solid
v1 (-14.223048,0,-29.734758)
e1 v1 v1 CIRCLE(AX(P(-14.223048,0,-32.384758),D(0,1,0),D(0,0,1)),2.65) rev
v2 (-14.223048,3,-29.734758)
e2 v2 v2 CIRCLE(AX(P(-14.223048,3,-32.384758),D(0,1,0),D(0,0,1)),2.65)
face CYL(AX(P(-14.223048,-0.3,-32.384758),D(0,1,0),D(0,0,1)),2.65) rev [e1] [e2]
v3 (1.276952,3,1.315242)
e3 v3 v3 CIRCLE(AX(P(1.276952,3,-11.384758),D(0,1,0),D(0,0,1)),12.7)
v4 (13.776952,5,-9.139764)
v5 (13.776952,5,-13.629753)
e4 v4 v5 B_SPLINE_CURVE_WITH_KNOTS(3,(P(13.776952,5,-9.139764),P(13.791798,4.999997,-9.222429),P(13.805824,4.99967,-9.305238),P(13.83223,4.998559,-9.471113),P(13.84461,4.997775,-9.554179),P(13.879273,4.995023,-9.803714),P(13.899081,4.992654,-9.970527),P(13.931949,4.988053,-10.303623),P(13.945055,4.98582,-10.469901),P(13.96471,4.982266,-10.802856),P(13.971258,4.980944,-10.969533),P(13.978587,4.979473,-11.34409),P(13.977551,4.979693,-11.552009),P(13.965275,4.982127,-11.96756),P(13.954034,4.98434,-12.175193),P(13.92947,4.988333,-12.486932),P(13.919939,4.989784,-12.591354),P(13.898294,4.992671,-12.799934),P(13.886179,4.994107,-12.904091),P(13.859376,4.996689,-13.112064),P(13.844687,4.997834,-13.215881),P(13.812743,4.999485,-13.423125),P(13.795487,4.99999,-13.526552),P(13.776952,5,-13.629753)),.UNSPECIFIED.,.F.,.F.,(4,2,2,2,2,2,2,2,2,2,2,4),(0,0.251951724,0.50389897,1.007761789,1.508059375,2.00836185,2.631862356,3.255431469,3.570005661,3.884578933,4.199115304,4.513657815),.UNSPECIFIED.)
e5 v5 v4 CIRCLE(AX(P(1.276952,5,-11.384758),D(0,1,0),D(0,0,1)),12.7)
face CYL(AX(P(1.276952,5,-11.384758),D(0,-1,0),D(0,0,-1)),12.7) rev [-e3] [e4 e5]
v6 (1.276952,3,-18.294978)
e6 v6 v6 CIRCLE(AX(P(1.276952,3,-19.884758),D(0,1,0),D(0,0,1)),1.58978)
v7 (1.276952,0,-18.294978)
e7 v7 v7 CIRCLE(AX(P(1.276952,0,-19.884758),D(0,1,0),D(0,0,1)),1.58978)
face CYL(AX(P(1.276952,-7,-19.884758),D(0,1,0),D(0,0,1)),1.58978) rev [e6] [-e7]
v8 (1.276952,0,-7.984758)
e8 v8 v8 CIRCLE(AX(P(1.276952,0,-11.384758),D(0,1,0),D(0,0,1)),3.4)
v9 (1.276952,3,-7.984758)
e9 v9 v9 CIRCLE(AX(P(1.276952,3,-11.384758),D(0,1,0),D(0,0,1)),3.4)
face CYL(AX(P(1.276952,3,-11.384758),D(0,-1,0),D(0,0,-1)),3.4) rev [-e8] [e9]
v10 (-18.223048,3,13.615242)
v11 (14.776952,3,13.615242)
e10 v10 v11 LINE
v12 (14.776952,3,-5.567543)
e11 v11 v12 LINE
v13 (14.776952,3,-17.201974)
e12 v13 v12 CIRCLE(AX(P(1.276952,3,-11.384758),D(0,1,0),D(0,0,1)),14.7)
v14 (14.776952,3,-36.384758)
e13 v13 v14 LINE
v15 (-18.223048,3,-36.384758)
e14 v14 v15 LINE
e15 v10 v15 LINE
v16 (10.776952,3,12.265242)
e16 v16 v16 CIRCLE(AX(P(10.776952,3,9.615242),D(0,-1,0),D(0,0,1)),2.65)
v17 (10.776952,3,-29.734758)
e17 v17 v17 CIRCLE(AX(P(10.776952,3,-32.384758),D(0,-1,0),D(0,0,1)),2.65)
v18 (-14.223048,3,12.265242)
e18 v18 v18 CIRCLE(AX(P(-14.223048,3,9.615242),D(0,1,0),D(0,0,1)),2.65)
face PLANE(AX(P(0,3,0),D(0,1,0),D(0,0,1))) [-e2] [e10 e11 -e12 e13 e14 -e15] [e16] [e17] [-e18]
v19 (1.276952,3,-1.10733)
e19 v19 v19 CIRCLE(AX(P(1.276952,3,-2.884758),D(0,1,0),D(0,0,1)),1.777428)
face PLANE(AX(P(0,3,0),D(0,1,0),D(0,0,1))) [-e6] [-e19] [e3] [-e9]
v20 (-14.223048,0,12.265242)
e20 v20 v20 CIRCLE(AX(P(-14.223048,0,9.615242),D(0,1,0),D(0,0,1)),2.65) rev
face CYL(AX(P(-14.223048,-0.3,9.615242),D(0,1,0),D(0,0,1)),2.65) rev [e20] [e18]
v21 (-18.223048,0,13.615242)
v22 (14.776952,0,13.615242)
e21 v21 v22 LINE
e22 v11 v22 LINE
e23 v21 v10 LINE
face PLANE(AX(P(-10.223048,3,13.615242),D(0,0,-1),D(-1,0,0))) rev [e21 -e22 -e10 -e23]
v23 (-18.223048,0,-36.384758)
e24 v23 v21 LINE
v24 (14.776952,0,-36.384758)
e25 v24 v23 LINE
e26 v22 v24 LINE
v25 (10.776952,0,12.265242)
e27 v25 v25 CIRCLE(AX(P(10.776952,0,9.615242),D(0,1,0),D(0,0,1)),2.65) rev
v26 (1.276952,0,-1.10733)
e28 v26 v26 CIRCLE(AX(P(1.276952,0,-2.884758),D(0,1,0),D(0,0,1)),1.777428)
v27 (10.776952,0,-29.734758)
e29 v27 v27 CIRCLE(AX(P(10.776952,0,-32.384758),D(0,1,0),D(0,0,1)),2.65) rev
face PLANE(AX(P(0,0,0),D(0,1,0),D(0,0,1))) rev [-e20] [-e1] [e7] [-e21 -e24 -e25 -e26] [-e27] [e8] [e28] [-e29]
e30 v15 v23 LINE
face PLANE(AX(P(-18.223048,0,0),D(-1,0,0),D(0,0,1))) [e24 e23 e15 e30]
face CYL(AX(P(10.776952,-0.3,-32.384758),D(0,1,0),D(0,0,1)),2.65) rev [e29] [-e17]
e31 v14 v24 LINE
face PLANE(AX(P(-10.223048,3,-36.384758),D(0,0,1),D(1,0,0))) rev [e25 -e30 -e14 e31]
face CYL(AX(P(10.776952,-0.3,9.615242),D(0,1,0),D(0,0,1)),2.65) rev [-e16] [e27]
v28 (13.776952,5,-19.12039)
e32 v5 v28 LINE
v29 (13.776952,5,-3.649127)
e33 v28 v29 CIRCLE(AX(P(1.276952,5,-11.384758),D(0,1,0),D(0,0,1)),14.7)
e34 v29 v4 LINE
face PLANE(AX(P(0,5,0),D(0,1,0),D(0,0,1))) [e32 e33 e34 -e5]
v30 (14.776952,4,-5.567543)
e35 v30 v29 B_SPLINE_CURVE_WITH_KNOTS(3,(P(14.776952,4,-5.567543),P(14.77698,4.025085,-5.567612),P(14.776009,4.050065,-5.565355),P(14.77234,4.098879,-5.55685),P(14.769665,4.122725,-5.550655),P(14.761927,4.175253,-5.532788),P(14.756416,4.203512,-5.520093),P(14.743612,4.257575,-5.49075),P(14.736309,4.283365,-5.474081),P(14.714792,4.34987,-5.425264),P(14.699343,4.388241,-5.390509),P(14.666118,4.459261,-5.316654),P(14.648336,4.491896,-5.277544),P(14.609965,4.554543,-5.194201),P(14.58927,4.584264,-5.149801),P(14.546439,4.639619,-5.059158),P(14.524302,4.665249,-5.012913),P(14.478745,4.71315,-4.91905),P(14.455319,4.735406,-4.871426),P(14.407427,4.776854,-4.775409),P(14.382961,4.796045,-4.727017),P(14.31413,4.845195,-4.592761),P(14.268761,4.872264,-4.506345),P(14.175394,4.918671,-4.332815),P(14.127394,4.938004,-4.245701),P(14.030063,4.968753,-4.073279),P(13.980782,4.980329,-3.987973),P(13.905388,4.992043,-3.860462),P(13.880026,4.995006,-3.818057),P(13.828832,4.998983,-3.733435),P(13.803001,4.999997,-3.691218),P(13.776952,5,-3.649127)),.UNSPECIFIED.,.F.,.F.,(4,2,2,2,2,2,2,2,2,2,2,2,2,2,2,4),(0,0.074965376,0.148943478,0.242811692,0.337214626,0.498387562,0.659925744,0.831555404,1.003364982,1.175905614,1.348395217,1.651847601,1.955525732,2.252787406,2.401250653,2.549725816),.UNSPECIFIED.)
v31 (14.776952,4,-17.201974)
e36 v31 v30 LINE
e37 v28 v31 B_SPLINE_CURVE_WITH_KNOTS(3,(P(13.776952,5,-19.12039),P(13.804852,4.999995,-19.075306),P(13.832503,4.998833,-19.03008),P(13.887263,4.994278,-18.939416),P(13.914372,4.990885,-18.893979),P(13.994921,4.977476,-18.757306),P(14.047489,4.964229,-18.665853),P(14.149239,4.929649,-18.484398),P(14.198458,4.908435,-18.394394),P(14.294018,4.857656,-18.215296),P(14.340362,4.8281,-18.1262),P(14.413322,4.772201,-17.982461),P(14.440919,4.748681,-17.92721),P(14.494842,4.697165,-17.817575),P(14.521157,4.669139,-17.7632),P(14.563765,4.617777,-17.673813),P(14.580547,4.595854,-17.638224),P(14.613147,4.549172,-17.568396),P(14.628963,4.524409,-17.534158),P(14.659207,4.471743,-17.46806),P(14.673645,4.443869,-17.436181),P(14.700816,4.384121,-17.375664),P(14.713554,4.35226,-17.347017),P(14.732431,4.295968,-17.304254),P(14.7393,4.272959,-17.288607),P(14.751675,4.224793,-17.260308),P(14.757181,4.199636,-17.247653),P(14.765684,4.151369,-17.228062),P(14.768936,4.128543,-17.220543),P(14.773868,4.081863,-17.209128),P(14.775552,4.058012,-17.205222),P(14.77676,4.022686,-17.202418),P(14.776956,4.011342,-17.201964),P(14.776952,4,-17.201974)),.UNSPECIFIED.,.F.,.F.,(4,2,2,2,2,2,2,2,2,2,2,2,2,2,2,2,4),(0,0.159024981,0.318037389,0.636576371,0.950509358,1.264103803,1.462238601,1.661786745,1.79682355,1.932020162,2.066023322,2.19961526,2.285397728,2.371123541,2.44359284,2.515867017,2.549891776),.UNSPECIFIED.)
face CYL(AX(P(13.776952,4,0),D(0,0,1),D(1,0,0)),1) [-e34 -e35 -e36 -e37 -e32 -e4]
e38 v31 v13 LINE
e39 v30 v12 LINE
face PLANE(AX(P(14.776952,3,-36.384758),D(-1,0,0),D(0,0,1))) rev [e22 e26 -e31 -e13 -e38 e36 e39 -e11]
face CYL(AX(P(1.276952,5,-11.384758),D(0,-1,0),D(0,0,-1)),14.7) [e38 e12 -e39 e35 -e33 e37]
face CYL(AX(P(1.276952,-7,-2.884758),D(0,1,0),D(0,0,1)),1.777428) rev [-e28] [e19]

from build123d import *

# Parameters (mm, degrees)
SKETCH1_W           = 25
SKETCH1_H           = 50
SKETCH1_R           = 3.4
BOSS_EXTRUDE1_DEPTH = 3
SKETCH2_W           = 50
SKETCH2_H           = 3
BOSS_EXTRUDE2_DEPTH = 8
SKETCH3_W           = 8
SKETCH3_H           = 50
BOSS_EXTRUDE3_DEPTH = 42
SKETCH4_R           = 2.65
CUT_EXTRUDE1_DEPTH  = 3.3
SKETCH5_R           = 5.802370205
CUT_EXTRUDE2_DEPTH  = 9
FILLET2_R           = 1
SKETCH6_R           = 12.7
BOSS_EXTRUDE4_DEPTH = 2
FILLET4_R           = 1
SKETCH8_R           = 1.589780168
SKETCH8_R_2         = 1.777428262
CUT_EXTRUDE3_DEPTH  = 10
SKETCH9_W           = 8
SKETCH9_H           = 42
CUT_EXTRUDE4_DEPTH  = 68.79439129


with BuildPart() as part:
    # Sketch1 → Boss-Extrude1 (new body)
    with BuildSketch(Plane(origin=(0, 0, 0), x_dir=(1, 0, 0), z_dir=(0, 1, 0))):
        with Locations((2.276951673, 11.384758364)):
            Rectangle(SKETCH1_W, SKETCH1_H)
        with Locations(Location((1.276951673, 11.384758364, 0), (0, 0, 270))):
            Circle(SKETCH1_R, mode=Mode.SUBTRACT)
    extrude(amount=BOSS_EXTRUDE1_DEPTH)

    # Sketch2 → Boss-Extrude2 (add)
    with BuildSketch(Plane.ZY.offset(10.223048327)):
        with Locations((-11.384758364, 1.5)):
            Rectangle(SKETCH2_W, SKETCH2_H)
    extrude(amount=BOSS_EXTRUDE2_DEPTH)

    # Sketch3 → Boss-Extrude3 (add)
    with BuildSketch(Plane.XZ):
        with Locations((-14.223048327, -11.384758364)):
            Rectangle(SKETCH3_W, SKETCH3_H)
    extrude(amount=BOSS_EXTRUDE3_DEPTH)

    # Sketch4 → Cut-Extrude1 (cut)
    with BuildSketch(Plane(origin=(0, 3, 0), x_dir=(1, 0, 0), z_dir=(0, 1, 0))):
        with Locations(Location((-14.223048327, 32.384758364, 0), (0, 0, 270))):
            Circle(SKETCH4_R)
        with Locations(Location((-14.223048327, -9.615241636, 0), (0, 0, 270))):
            Circle(SKETCH4_R)
    cut_extrude1 = extrude(amount=-CUT_EXTRUDE1_DEPTH, mode=Mode.SUBTRACT)

    # Mirror1: Cut-Extrude1 across plane
    add(cut_extrude1.mirror(Plane.ZX.offset(-19.5)), mode=Mode.SUBTRACT)

    # Sketch5 → Cut-Extrude2 (cut)
    with BuildSketch(Plane.ZY.offset(18.223048327)):
        with Locations((-11.836279124, -21)):
            Circle(SKETCH5_R)
    extrude(amount=-CUT_EXTRUDE2_DEPTH, mode=Mode.SUBTRACT)

    # Fillet2
    fillet2_edges = [part.edges().sort_by_distance(p)[0] for p in [
        (-10.223048327, -21, -17.638649329),
    ]]
    fillet(fillet2_edges, radius=FILLET2_R)

    # Mirror2: Cut-Extrude1 across plane
    add(cut_extrude1.mirror(Plane.ZY.offset(1.723048327)), mode=Mode.SUBTRACT)

    # Sketch6 → Boss-Extrude4 (add)
    with BuildSketch(Plane(origin=(0, 3, 0), x_dir=(1, 0, 0), z_dir=(0, 1, 0))):
        with BuildLine():
            Line((14.776951673, 5.567542535), (14.776951673, 17.201974193))
            ThreePointArc((14.776951673, 17.201974193), (-13.423048327, 11.384758364), (14.776951673, 5.567542535))
        make_face()
        with Locations(Location((1.276951673, 11.384758364, 0), (0, 0, 270))):
            Circle(SKETCH6_R, mode=Mode.SUBTRACT)
    extrude(amount=BOSS_EXTRUDE4_DEPTH)

    # Fillet4
    # the kernel refuses this fillet: 1 mm, written as the material it takes off along each edge
    with BuildSketch(Plane(origin=(14.776951673, 5, -3.067542535), x_dir=(0, -1, 0), z_dir=(0, 0, -1))) as fillet4_piece_1:
        with BuildLine():
            CenterArc((FILLET4_R, FILLET4_R), FILLET4_R, 180, 90)
            Line((0, FILLET4_R), (0, 0))
            Line((0, 0), (FILLET4_R, 0))
        make_face()
    extrude(amount=16.634431658, mode=Mode.SUBTRACT)

    # Sketch8 → Cut-Extrude3 (cut)
    with BuildSketch(Plane(origin=(0, 3, 0), x_dir=(1, 0, 0), z_dir=(0, 1, 0))):
        with Locations(Location((1.276951673, 19.884758364, 0), (0, 0, 270))):
            Circle(SKETCH8_R)
        with Locations(Location((1.276951673, 2.884758364, 0), (0, 0, 270))):
            Circle(SKETCH8_R_2)
    extrude(amount=-CUT_EXTRUDE3_DEPTH, mode=Mode.SUBTRACT)

    # Sketch9 → Cut-Extrude4 (cut, through all)
    with BuildSketch(Plane.XY.offset(13.615241636)):
        with Locations((-14.223048327, -21)):
            Rectangle(SKETCH9_W, SKETCH9_H)
    extrude(amount=-CUT_EXTRUDE4_DEPTH, mode=Mode.SUBTRACT)


solid = part.part
